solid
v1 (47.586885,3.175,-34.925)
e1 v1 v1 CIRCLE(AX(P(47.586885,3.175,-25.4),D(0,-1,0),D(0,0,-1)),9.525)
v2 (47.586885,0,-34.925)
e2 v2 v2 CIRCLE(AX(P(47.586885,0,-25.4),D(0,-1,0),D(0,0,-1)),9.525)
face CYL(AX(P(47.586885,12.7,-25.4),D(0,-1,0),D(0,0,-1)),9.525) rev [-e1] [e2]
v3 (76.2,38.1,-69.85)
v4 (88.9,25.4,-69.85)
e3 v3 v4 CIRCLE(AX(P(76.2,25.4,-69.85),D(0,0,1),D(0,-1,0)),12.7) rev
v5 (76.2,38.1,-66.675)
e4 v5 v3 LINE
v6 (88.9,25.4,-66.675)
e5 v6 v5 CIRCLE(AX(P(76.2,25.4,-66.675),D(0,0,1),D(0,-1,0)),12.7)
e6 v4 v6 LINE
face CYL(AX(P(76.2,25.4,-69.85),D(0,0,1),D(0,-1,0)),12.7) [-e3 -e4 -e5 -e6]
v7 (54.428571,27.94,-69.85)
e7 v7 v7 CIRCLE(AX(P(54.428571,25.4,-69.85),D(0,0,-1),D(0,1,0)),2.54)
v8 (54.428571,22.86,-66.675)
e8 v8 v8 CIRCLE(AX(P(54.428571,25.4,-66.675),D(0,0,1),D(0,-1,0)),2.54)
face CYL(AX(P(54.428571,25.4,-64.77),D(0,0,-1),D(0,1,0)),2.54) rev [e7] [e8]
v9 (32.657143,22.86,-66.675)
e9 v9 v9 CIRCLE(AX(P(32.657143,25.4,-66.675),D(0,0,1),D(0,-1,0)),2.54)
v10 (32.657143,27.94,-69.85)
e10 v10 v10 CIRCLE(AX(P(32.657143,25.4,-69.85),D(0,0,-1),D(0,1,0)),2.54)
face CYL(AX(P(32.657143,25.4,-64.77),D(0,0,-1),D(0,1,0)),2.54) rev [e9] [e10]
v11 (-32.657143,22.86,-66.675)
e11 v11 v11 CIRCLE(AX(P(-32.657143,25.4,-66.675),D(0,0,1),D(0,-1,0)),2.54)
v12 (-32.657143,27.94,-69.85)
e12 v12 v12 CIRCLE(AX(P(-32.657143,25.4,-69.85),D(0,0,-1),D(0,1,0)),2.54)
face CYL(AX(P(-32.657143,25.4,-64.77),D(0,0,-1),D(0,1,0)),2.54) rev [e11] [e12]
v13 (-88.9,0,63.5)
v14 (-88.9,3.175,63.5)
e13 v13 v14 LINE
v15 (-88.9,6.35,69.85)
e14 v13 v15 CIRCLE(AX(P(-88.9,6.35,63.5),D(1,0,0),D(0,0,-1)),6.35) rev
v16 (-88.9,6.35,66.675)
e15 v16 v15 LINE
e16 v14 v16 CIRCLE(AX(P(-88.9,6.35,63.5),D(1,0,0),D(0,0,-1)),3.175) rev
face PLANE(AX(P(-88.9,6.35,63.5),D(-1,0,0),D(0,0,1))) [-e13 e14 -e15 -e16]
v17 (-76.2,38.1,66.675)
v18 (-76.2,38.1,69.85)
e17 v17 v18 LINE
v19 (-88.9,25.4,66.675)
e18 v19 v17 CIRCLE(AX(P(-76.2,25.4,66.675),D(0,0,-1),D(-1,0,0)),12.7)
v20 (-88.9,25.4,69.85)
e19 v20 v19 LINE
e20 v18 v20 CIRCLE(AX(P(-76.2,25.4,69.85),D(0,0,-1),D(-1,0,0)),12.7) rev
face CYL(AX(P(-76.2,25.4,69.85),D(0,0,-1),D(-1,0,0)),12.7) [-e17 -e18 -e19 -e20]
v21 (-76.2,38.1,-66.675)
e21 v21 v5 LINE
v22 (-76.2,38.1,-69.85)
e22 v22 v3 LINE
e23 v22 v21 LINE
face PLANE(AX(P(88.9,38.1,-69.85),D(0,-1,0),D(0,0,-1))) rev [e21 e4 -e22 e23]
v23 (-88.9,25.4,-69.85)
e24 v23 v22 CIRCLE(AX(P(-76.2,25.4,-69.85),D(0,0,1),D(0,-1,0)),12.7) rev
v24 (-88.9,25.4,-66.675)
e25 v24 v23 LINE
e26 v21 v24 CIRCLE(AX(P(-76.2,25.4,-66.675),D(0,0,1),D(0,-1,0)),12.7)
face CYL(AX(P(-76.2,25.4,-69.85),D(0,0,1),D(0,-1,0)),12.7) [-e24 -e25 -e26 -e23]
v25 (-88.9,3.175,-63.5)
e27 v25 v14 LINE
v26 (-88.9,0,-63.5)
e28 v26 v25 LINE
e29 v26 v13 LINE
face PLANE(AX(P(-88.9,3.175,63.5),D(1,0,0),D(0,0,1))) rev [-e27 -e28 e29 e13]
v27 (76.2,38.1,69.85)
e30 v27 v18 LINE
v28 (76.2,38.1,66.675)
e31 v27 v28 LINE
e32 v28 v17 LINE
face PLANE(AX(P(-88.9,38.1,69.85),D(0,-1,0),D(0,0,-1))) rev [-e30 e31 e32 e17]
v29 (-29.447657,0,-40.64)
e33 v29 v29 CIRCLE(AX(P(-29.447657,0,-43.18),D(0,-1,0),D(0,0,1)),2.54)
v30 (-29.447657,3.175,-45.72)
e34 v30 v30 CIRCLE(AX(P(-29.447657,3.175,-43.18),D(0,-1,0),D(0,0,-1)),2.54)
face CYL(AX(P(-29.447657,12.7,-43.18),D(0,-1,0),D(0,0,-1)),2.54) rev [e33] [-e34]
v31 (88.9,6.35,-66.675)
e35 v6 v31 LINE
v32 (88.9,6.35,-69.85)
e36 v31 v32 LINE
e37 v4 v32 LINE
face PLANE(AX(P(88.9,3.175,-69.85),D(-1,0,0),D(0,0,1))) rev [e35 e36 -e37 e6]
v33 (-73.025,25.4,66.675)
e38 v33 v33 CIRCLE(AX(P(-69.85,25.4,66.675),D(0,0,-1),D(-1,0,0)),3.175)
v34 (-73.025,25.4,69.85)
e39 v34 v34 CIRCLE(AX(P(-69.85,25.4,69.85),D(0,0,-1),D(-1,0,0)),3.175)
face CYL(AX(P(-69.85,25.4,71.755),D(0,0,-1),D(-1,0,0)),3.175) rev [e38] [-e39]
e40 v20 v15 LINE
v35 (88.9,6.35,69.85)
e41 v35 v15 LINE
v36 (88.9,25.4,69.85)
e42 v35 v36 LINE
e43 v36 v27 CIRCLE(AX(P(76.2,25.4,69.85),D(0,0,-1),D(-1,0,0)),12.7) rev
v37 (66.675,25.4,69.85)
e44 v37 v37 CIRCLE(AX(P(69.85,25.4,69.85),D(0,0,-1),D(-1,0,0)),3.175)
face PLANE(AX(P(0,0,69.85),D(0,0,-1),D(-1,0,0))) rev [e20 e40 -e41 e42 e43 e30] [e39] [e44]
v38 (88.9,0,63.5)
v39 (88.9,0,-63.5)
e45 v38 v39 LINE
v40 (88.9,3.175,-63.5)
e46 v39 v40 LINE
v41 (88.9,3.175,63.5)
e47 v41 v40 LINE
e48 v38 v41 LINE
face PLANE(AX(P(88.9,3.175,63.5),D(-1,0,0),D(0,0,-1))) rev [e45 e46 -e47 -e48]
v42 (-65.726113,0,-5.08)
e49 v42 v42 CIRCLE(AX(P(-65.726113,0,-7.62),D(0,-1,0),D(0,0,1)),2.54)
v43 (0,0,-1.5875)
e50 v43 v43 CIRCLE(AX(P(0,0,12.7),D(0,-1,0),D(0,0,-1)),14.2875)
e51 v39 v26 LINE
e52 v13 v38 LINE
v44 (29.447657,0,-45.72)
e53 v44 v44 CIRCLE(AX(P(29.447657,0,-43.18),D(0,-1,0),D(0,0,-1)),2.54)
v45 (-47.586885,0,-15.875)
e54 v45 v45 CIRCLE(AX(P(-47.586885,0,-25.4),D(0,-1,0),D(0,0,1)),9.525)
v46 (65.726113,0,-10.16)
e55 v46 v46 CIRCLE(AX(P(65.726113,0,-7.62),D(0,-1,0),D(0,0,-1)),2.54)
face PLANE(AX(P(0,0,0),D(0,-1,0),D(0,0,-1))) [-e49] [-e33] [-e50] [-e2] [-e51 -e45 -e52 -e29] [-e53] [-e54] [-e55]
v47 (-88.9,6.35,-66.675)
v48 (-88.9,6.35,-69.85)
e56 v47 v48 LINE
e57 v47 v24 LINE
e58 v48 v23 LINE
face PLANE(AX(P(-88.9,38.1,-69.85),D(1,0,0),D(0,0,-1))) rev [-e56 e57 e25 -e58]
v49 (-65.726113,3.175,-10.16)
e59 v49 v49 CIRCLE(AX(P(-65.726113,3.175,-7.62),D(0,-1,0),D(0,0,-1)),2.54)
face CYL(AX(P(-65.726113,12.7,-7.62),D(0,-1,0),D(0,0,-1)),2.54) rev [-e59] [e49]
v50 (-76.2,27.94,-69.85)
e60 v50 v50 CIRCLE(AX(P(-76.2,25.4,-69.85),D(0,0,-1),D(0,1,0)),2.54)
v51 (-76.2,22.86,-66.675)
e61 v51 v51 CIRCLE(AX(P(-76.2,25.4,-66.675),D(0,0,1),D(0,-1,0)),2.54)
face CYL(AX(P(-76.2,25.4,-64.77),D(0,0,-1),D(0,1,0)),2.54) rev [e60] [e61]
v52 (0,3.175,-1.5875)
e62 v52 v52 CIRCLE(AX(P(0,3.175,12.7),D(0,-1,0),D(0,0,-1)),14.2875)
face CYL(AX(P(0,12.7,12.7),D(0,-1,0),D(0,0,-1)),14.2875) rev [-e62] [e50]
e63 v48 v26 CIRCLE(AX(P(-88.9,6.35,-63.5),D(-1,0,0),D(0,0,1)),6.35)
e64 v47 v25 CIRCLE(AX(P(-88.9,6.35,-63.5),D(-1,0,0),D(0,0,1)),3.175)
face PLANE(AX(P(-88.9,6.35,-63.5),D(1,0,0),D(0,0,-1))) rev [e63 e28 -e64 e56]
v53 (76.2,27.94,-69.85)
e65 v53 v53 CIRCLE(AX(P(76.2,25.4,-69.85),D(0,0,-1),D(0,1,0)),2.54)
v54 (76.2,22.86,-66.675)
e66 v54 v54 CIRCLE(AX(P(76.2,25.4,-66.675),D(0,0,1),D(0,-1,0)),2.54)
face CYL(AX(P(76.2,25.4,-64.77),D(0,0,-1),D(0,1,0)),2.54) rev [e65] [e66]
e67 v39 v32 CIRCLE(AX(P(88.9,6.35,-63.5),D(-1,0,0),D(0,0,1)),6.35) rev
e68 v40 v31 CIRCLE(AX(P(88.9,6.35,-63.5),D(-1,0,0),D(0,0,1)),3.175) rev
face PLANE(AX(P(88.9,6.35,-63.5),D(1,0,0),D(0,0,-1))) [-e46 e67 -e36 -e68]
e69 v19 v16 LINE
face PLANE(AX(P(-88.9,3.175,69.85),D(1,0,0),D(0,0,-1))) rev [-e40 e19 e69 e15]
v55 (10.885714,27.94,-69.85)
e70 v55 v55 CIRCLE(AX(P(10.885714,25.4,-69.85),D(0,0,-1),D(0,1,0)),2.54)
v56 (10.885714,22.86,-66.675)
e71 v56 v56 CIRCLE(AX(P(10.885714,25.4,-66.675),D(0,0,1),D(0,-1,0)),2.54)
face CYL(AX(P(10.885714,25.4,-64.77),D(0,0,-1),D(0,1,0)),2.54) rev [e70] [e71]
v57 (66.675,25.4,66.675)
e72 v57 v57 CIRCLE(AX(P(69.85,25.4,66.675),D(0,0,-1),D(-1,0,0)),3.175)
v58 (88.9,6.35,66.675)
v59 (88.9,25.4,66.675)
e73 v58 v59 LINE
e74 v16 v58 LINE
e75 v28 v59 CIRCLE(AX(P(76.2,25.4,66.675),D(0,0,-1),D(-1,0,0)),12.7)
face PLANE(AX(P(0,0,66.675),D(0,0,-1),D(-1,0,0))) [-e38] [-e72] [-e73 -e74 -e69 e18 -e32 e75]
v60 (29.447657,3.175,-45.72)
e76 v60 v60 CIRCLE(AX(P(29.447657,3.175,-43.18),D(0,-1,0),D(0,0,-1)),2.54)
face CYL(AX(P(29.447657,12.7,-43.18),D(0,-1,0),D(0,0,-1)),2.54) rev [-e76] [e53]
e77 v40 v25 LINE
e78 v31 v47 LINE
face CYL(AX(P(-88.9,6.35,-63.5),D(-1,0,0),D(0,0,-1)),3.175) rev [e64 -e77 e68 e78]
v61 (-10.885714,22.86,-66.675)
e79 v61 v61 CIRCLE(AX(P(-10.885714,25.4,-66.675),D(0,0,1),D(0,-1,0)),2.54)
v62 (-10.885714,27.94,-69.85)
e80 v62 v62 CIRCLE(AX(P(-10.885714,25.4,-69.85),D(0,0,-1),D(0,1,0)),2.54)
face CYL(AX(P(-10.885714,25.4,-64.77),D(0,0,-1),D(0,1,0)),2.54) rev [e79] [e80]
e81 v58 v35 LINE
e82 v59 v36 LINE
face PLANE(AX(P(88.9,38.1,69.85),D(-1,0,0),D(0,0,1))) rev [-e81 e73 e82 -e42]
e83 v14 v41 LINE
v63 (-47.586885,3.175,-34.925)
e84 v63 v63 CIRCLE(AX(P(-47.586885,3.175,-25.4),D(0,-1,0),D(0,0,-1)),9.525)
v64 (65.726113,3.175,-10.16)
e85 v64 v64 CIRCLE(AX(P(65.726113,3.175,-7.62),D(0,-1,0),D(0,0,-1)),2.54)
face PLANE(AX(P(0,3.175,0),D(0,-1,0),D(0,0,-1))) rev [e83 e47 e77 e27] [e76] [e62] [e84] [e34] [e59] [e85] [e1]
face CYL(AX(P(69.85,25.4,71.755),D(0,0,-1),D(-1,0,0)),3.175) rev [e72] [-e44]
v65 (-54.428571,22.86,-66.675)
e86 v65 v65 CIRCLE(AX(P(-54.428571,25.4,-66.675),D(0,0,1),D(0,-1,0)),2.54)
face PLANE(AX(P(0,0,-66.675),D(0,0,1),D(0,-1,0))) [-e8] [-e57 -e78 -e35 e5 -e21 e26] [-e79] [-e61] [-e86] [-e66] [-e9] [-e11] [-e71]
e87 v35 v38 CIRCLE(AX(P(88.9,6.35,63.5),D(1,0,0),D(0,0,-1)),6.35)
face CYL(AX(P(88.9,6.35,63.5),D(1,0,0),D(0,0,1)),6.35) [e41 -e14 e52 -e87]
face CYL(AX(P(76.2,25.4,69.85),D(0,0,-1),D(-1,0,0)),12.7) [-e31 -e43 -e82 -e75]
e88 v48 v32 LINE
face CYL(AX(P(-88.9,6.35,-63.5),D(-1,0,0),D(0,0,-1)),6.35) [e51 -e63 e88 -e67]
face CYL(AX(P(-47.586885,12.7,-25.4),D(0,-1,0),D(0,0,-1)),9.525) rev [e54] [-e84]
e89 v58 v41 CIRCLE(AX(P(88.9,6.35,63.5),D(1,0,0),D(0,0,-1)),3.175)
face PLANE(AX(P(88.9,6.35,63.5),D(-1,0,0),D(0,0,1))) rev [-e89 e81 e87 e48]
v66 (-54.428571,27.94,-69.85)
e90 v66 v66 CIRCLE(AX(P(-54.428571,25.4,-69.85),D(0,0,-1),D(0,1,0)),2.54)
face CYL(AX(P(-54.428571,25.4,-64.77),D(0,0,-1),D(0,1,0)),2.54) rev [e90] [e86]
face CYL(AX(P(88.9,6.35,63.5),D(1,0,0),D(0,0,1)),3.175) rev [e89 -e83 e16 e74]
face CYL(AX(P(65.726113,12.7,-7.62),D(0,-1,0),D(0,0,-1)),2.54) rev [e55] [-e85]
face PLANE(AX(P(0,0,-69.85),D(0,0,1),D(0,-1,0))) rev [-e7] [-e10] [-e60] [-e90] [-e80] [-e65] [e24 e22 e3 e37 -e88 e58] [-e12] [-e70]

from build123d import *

# Parameters (mm, degrees)
SKETCH1_W           = 177.8
SKETCH1_H           = 127
BOSS_EXTRUDE1_DEPTH = 3.175
EDGE_FLANGE1_DEPTH  = 177.8
EDGE_FLANGE2_DEPTH  = 177.8
SKETCH17_R          = 2.54
CUT_EXTRUDE1_DEPTH  = 5.08
FILLET1_R           = 12.7
SKETCH18_R          = 3.175
CUT_EXTRUDE2_DEPTH  = 5.08
SKETCH19_R          = 14.2875
CUT_EXTRUDE3_DEPTH  = 12.7
SKETCH20_R          = 9.525
CUT_EXTRUDE4_DEPTH  = 12.7
SKETCH21_R          = 2.54
CUT_EXTRUDE6_DEPTH  = 12.7


# Sheet-metal steps are written as plain solids
with BuildPart() as part:
    # Sketch1 → Boss-Extrude1 (new body)
    with BuildSketch(Plane(origin=(0, 0, 0), x_dir=(1, 0, 0), z_dir=(0, 1, 0))):
        Rectangle(SKETCH1_W, SKETCH1_H)
    extrude(amount=BOSS_EXTRUDE1_DEPTH)

    # Edge-Flange1 section (across the edge) → Edge-Flange1 (add)
    with BuildSketch(Plane(origin=(88.9, 3.175, -66.675), x_dir=(0, 0, 1), z_dir=(-1, 0, 0))):
        with BuildLine():
            Line((-3.175, 3.175), (-3.175, 34.925))
            Line((-3.175, 34.925), (0, 34.925))
            Line((0, 34.925), (0, 3.175))
            ThreePointArc((0, 3.175), (0.92993597, 0.92993597), (3.175, 0))
            Line((3.175, 0), (3.175, -3.175))
            ThreePointArc((3.175, -3.175), (-1.315128061, -1.315128061), (-3.175, 3.175))
        make_face()
    extrude(amount=EDGE_FLANGE1_DEPTH)

    # Edge-Flange2 section (across the edge) → Edge-Flange2 (add)
    with BuildSketch(Plane(origin=(-88.9, 3.175, 66.675), x_dir=(0, 0, -1), z_dir=(1, 0, 0))):
        with BuildLine():
            Line((-3.175, 3.175), (-3.175, 34.925))
            Line((-3.175, 34.925), (0, 34.925))
            Line((0, 34.925), (0, 3.175))
            ThreePointArc((0, 3.175), (0.92993597, 0.92993597), (3.175, 0))
            Line((3.175, 0), (3.175, -3.175))
            ThreePointArc((3.175, -3.175), (-1.315128061, -1.315128061), (-3.175, 3.175))
        make_face()
    extrude(amount=EDGE_FLANGE2_DEPTH)

    # Sketch17 → Cut-Extrude1 (cut)
    with BuildSketch(Plane(origin=(0, 0, -69.85), x_dir=(-1, 0, 0), z_dir=(0, 0, -1))):
        with Locations(Location((-76.2, 25.4, 0), (0, 0, 90))):
            Circle(SKETCH17_R)
        with Locations(Location((-54.428571429, 25.4, 0), (0, 0, 90))):
            Circle(SKETCH17_R)
        with Locations(Location((-32.657142857, 25.4, 0), (0, 0, 90))):
            Circle(SKETCH17_R)
        with Locations(Location((-10.885714286, 25.4, 0), (0, 0, 90))):
            Circle(SKETCH17_R)
        with Locations(Location((10.885714286, 25.4, 0), (0, 0, 90))):
            Circle(SKETCH17_R)
        with Locations(Location((32.657142857, 25.4, 0), (0, 0, 90))):
            Circle(SKETCH17_R)
        with Locations(Location((54.428571429, 25.4, 0), (0, 0, 90))):
            Circle(SKETCH17_R)
        with Locations(Location((76.2, 25.4, 0), (0, 0, 90))):
            Circle(SKETCH17_R)
    extrude(amount=-CUT_EXTRUDE1_DEPTH, mode=Mode.SUBTRACT)

    # Fillet1
    fillet1_edges = [part.edges().sort_by_distance(p)[0] for p in [
        (88.9, 38.1, -68.2625),
        (-88.9, 38.1, -68.2625),
        (-88.9, 38.1, 68.2625),
        (88.9, 38.1, 68.2625),
    ]]
    fillet(fillet1_edges, radius=FILLET1_R)

    # Sketch18 → Cut-Extrude2 (cut)
    with BuildSketch(Plane(origin=(0, 0, 66.675), x_dir=(-1, 0, 0), z_dir=(0, 0, -1))):
        with Locations((69.85, 25.4)):
            Circle(SKETCH18_R)
        with Locations((-69.85, 25.4)):
            Circle(SKETCH18_R)
    extrude(amount=-CUT_EXTRUDE2_DEPTH, mode=Mode.SUBTRACT)

    # Sketch19 → Cut-Extrude3 (cut)
    with BuildSketch(Plane(origin=(0, 0, 0), x_dir=(-1, 0, 0), z_dir=(0, -1, 0))):
        with Locations(Location((0, -12.7, 0), (0, 0, 90))):
            Circle(SKETCH19_R)
    extrude(amount=-CUT_EXTRUDE3_DEPTH, mode=Mode.SUBTRACT)

    # Sketch20 → Cut-Extrude4 (cut)
    with BuildSketch(Plane.XZ):
        with Locations(Location((47.586884748, -25.4, 0), (0, 0, 270))):
            Circle(SKETCH20_R)
        with Locations(Location((-47.586884748, -25.4, 0), (0, 0, 270))):
            Circle(SKETCH20_R)
    extrude(amount=-CUT_EXTRUDE4_DEPTH, mode=Mode.SUBTRACT)

    # Sketch21 → Cut-Extrude6 (cut)
    with BuildSketch(Plane(origin=(0, 0, 0), x_dir=(-1, 0, 0), z_dir=(0, -1, 0))):
        with Locations(Location((-65.726112956, 7.62, 0), (0, 0, 90))):
            Circle(SKETCH21_R)
        with Locations(Location((-29.447656539, 43.18, 0), (0, 0, 90))):
            Circle(SKETCH21_R)
        with Locations(Location((65.726112956, 7.62, 0), (0, 0, 90))):
            Circle(SKETCH21_R)
        with Locations(Location((29.447656539, 43.18, 0), (0, 0, 90))):
            Circle(SKETCH21_R)
    extrude(amount=-CUT_EXTRUDE6_DEPTH, mode=Mode.SUBTRACT)


solid = part.part
